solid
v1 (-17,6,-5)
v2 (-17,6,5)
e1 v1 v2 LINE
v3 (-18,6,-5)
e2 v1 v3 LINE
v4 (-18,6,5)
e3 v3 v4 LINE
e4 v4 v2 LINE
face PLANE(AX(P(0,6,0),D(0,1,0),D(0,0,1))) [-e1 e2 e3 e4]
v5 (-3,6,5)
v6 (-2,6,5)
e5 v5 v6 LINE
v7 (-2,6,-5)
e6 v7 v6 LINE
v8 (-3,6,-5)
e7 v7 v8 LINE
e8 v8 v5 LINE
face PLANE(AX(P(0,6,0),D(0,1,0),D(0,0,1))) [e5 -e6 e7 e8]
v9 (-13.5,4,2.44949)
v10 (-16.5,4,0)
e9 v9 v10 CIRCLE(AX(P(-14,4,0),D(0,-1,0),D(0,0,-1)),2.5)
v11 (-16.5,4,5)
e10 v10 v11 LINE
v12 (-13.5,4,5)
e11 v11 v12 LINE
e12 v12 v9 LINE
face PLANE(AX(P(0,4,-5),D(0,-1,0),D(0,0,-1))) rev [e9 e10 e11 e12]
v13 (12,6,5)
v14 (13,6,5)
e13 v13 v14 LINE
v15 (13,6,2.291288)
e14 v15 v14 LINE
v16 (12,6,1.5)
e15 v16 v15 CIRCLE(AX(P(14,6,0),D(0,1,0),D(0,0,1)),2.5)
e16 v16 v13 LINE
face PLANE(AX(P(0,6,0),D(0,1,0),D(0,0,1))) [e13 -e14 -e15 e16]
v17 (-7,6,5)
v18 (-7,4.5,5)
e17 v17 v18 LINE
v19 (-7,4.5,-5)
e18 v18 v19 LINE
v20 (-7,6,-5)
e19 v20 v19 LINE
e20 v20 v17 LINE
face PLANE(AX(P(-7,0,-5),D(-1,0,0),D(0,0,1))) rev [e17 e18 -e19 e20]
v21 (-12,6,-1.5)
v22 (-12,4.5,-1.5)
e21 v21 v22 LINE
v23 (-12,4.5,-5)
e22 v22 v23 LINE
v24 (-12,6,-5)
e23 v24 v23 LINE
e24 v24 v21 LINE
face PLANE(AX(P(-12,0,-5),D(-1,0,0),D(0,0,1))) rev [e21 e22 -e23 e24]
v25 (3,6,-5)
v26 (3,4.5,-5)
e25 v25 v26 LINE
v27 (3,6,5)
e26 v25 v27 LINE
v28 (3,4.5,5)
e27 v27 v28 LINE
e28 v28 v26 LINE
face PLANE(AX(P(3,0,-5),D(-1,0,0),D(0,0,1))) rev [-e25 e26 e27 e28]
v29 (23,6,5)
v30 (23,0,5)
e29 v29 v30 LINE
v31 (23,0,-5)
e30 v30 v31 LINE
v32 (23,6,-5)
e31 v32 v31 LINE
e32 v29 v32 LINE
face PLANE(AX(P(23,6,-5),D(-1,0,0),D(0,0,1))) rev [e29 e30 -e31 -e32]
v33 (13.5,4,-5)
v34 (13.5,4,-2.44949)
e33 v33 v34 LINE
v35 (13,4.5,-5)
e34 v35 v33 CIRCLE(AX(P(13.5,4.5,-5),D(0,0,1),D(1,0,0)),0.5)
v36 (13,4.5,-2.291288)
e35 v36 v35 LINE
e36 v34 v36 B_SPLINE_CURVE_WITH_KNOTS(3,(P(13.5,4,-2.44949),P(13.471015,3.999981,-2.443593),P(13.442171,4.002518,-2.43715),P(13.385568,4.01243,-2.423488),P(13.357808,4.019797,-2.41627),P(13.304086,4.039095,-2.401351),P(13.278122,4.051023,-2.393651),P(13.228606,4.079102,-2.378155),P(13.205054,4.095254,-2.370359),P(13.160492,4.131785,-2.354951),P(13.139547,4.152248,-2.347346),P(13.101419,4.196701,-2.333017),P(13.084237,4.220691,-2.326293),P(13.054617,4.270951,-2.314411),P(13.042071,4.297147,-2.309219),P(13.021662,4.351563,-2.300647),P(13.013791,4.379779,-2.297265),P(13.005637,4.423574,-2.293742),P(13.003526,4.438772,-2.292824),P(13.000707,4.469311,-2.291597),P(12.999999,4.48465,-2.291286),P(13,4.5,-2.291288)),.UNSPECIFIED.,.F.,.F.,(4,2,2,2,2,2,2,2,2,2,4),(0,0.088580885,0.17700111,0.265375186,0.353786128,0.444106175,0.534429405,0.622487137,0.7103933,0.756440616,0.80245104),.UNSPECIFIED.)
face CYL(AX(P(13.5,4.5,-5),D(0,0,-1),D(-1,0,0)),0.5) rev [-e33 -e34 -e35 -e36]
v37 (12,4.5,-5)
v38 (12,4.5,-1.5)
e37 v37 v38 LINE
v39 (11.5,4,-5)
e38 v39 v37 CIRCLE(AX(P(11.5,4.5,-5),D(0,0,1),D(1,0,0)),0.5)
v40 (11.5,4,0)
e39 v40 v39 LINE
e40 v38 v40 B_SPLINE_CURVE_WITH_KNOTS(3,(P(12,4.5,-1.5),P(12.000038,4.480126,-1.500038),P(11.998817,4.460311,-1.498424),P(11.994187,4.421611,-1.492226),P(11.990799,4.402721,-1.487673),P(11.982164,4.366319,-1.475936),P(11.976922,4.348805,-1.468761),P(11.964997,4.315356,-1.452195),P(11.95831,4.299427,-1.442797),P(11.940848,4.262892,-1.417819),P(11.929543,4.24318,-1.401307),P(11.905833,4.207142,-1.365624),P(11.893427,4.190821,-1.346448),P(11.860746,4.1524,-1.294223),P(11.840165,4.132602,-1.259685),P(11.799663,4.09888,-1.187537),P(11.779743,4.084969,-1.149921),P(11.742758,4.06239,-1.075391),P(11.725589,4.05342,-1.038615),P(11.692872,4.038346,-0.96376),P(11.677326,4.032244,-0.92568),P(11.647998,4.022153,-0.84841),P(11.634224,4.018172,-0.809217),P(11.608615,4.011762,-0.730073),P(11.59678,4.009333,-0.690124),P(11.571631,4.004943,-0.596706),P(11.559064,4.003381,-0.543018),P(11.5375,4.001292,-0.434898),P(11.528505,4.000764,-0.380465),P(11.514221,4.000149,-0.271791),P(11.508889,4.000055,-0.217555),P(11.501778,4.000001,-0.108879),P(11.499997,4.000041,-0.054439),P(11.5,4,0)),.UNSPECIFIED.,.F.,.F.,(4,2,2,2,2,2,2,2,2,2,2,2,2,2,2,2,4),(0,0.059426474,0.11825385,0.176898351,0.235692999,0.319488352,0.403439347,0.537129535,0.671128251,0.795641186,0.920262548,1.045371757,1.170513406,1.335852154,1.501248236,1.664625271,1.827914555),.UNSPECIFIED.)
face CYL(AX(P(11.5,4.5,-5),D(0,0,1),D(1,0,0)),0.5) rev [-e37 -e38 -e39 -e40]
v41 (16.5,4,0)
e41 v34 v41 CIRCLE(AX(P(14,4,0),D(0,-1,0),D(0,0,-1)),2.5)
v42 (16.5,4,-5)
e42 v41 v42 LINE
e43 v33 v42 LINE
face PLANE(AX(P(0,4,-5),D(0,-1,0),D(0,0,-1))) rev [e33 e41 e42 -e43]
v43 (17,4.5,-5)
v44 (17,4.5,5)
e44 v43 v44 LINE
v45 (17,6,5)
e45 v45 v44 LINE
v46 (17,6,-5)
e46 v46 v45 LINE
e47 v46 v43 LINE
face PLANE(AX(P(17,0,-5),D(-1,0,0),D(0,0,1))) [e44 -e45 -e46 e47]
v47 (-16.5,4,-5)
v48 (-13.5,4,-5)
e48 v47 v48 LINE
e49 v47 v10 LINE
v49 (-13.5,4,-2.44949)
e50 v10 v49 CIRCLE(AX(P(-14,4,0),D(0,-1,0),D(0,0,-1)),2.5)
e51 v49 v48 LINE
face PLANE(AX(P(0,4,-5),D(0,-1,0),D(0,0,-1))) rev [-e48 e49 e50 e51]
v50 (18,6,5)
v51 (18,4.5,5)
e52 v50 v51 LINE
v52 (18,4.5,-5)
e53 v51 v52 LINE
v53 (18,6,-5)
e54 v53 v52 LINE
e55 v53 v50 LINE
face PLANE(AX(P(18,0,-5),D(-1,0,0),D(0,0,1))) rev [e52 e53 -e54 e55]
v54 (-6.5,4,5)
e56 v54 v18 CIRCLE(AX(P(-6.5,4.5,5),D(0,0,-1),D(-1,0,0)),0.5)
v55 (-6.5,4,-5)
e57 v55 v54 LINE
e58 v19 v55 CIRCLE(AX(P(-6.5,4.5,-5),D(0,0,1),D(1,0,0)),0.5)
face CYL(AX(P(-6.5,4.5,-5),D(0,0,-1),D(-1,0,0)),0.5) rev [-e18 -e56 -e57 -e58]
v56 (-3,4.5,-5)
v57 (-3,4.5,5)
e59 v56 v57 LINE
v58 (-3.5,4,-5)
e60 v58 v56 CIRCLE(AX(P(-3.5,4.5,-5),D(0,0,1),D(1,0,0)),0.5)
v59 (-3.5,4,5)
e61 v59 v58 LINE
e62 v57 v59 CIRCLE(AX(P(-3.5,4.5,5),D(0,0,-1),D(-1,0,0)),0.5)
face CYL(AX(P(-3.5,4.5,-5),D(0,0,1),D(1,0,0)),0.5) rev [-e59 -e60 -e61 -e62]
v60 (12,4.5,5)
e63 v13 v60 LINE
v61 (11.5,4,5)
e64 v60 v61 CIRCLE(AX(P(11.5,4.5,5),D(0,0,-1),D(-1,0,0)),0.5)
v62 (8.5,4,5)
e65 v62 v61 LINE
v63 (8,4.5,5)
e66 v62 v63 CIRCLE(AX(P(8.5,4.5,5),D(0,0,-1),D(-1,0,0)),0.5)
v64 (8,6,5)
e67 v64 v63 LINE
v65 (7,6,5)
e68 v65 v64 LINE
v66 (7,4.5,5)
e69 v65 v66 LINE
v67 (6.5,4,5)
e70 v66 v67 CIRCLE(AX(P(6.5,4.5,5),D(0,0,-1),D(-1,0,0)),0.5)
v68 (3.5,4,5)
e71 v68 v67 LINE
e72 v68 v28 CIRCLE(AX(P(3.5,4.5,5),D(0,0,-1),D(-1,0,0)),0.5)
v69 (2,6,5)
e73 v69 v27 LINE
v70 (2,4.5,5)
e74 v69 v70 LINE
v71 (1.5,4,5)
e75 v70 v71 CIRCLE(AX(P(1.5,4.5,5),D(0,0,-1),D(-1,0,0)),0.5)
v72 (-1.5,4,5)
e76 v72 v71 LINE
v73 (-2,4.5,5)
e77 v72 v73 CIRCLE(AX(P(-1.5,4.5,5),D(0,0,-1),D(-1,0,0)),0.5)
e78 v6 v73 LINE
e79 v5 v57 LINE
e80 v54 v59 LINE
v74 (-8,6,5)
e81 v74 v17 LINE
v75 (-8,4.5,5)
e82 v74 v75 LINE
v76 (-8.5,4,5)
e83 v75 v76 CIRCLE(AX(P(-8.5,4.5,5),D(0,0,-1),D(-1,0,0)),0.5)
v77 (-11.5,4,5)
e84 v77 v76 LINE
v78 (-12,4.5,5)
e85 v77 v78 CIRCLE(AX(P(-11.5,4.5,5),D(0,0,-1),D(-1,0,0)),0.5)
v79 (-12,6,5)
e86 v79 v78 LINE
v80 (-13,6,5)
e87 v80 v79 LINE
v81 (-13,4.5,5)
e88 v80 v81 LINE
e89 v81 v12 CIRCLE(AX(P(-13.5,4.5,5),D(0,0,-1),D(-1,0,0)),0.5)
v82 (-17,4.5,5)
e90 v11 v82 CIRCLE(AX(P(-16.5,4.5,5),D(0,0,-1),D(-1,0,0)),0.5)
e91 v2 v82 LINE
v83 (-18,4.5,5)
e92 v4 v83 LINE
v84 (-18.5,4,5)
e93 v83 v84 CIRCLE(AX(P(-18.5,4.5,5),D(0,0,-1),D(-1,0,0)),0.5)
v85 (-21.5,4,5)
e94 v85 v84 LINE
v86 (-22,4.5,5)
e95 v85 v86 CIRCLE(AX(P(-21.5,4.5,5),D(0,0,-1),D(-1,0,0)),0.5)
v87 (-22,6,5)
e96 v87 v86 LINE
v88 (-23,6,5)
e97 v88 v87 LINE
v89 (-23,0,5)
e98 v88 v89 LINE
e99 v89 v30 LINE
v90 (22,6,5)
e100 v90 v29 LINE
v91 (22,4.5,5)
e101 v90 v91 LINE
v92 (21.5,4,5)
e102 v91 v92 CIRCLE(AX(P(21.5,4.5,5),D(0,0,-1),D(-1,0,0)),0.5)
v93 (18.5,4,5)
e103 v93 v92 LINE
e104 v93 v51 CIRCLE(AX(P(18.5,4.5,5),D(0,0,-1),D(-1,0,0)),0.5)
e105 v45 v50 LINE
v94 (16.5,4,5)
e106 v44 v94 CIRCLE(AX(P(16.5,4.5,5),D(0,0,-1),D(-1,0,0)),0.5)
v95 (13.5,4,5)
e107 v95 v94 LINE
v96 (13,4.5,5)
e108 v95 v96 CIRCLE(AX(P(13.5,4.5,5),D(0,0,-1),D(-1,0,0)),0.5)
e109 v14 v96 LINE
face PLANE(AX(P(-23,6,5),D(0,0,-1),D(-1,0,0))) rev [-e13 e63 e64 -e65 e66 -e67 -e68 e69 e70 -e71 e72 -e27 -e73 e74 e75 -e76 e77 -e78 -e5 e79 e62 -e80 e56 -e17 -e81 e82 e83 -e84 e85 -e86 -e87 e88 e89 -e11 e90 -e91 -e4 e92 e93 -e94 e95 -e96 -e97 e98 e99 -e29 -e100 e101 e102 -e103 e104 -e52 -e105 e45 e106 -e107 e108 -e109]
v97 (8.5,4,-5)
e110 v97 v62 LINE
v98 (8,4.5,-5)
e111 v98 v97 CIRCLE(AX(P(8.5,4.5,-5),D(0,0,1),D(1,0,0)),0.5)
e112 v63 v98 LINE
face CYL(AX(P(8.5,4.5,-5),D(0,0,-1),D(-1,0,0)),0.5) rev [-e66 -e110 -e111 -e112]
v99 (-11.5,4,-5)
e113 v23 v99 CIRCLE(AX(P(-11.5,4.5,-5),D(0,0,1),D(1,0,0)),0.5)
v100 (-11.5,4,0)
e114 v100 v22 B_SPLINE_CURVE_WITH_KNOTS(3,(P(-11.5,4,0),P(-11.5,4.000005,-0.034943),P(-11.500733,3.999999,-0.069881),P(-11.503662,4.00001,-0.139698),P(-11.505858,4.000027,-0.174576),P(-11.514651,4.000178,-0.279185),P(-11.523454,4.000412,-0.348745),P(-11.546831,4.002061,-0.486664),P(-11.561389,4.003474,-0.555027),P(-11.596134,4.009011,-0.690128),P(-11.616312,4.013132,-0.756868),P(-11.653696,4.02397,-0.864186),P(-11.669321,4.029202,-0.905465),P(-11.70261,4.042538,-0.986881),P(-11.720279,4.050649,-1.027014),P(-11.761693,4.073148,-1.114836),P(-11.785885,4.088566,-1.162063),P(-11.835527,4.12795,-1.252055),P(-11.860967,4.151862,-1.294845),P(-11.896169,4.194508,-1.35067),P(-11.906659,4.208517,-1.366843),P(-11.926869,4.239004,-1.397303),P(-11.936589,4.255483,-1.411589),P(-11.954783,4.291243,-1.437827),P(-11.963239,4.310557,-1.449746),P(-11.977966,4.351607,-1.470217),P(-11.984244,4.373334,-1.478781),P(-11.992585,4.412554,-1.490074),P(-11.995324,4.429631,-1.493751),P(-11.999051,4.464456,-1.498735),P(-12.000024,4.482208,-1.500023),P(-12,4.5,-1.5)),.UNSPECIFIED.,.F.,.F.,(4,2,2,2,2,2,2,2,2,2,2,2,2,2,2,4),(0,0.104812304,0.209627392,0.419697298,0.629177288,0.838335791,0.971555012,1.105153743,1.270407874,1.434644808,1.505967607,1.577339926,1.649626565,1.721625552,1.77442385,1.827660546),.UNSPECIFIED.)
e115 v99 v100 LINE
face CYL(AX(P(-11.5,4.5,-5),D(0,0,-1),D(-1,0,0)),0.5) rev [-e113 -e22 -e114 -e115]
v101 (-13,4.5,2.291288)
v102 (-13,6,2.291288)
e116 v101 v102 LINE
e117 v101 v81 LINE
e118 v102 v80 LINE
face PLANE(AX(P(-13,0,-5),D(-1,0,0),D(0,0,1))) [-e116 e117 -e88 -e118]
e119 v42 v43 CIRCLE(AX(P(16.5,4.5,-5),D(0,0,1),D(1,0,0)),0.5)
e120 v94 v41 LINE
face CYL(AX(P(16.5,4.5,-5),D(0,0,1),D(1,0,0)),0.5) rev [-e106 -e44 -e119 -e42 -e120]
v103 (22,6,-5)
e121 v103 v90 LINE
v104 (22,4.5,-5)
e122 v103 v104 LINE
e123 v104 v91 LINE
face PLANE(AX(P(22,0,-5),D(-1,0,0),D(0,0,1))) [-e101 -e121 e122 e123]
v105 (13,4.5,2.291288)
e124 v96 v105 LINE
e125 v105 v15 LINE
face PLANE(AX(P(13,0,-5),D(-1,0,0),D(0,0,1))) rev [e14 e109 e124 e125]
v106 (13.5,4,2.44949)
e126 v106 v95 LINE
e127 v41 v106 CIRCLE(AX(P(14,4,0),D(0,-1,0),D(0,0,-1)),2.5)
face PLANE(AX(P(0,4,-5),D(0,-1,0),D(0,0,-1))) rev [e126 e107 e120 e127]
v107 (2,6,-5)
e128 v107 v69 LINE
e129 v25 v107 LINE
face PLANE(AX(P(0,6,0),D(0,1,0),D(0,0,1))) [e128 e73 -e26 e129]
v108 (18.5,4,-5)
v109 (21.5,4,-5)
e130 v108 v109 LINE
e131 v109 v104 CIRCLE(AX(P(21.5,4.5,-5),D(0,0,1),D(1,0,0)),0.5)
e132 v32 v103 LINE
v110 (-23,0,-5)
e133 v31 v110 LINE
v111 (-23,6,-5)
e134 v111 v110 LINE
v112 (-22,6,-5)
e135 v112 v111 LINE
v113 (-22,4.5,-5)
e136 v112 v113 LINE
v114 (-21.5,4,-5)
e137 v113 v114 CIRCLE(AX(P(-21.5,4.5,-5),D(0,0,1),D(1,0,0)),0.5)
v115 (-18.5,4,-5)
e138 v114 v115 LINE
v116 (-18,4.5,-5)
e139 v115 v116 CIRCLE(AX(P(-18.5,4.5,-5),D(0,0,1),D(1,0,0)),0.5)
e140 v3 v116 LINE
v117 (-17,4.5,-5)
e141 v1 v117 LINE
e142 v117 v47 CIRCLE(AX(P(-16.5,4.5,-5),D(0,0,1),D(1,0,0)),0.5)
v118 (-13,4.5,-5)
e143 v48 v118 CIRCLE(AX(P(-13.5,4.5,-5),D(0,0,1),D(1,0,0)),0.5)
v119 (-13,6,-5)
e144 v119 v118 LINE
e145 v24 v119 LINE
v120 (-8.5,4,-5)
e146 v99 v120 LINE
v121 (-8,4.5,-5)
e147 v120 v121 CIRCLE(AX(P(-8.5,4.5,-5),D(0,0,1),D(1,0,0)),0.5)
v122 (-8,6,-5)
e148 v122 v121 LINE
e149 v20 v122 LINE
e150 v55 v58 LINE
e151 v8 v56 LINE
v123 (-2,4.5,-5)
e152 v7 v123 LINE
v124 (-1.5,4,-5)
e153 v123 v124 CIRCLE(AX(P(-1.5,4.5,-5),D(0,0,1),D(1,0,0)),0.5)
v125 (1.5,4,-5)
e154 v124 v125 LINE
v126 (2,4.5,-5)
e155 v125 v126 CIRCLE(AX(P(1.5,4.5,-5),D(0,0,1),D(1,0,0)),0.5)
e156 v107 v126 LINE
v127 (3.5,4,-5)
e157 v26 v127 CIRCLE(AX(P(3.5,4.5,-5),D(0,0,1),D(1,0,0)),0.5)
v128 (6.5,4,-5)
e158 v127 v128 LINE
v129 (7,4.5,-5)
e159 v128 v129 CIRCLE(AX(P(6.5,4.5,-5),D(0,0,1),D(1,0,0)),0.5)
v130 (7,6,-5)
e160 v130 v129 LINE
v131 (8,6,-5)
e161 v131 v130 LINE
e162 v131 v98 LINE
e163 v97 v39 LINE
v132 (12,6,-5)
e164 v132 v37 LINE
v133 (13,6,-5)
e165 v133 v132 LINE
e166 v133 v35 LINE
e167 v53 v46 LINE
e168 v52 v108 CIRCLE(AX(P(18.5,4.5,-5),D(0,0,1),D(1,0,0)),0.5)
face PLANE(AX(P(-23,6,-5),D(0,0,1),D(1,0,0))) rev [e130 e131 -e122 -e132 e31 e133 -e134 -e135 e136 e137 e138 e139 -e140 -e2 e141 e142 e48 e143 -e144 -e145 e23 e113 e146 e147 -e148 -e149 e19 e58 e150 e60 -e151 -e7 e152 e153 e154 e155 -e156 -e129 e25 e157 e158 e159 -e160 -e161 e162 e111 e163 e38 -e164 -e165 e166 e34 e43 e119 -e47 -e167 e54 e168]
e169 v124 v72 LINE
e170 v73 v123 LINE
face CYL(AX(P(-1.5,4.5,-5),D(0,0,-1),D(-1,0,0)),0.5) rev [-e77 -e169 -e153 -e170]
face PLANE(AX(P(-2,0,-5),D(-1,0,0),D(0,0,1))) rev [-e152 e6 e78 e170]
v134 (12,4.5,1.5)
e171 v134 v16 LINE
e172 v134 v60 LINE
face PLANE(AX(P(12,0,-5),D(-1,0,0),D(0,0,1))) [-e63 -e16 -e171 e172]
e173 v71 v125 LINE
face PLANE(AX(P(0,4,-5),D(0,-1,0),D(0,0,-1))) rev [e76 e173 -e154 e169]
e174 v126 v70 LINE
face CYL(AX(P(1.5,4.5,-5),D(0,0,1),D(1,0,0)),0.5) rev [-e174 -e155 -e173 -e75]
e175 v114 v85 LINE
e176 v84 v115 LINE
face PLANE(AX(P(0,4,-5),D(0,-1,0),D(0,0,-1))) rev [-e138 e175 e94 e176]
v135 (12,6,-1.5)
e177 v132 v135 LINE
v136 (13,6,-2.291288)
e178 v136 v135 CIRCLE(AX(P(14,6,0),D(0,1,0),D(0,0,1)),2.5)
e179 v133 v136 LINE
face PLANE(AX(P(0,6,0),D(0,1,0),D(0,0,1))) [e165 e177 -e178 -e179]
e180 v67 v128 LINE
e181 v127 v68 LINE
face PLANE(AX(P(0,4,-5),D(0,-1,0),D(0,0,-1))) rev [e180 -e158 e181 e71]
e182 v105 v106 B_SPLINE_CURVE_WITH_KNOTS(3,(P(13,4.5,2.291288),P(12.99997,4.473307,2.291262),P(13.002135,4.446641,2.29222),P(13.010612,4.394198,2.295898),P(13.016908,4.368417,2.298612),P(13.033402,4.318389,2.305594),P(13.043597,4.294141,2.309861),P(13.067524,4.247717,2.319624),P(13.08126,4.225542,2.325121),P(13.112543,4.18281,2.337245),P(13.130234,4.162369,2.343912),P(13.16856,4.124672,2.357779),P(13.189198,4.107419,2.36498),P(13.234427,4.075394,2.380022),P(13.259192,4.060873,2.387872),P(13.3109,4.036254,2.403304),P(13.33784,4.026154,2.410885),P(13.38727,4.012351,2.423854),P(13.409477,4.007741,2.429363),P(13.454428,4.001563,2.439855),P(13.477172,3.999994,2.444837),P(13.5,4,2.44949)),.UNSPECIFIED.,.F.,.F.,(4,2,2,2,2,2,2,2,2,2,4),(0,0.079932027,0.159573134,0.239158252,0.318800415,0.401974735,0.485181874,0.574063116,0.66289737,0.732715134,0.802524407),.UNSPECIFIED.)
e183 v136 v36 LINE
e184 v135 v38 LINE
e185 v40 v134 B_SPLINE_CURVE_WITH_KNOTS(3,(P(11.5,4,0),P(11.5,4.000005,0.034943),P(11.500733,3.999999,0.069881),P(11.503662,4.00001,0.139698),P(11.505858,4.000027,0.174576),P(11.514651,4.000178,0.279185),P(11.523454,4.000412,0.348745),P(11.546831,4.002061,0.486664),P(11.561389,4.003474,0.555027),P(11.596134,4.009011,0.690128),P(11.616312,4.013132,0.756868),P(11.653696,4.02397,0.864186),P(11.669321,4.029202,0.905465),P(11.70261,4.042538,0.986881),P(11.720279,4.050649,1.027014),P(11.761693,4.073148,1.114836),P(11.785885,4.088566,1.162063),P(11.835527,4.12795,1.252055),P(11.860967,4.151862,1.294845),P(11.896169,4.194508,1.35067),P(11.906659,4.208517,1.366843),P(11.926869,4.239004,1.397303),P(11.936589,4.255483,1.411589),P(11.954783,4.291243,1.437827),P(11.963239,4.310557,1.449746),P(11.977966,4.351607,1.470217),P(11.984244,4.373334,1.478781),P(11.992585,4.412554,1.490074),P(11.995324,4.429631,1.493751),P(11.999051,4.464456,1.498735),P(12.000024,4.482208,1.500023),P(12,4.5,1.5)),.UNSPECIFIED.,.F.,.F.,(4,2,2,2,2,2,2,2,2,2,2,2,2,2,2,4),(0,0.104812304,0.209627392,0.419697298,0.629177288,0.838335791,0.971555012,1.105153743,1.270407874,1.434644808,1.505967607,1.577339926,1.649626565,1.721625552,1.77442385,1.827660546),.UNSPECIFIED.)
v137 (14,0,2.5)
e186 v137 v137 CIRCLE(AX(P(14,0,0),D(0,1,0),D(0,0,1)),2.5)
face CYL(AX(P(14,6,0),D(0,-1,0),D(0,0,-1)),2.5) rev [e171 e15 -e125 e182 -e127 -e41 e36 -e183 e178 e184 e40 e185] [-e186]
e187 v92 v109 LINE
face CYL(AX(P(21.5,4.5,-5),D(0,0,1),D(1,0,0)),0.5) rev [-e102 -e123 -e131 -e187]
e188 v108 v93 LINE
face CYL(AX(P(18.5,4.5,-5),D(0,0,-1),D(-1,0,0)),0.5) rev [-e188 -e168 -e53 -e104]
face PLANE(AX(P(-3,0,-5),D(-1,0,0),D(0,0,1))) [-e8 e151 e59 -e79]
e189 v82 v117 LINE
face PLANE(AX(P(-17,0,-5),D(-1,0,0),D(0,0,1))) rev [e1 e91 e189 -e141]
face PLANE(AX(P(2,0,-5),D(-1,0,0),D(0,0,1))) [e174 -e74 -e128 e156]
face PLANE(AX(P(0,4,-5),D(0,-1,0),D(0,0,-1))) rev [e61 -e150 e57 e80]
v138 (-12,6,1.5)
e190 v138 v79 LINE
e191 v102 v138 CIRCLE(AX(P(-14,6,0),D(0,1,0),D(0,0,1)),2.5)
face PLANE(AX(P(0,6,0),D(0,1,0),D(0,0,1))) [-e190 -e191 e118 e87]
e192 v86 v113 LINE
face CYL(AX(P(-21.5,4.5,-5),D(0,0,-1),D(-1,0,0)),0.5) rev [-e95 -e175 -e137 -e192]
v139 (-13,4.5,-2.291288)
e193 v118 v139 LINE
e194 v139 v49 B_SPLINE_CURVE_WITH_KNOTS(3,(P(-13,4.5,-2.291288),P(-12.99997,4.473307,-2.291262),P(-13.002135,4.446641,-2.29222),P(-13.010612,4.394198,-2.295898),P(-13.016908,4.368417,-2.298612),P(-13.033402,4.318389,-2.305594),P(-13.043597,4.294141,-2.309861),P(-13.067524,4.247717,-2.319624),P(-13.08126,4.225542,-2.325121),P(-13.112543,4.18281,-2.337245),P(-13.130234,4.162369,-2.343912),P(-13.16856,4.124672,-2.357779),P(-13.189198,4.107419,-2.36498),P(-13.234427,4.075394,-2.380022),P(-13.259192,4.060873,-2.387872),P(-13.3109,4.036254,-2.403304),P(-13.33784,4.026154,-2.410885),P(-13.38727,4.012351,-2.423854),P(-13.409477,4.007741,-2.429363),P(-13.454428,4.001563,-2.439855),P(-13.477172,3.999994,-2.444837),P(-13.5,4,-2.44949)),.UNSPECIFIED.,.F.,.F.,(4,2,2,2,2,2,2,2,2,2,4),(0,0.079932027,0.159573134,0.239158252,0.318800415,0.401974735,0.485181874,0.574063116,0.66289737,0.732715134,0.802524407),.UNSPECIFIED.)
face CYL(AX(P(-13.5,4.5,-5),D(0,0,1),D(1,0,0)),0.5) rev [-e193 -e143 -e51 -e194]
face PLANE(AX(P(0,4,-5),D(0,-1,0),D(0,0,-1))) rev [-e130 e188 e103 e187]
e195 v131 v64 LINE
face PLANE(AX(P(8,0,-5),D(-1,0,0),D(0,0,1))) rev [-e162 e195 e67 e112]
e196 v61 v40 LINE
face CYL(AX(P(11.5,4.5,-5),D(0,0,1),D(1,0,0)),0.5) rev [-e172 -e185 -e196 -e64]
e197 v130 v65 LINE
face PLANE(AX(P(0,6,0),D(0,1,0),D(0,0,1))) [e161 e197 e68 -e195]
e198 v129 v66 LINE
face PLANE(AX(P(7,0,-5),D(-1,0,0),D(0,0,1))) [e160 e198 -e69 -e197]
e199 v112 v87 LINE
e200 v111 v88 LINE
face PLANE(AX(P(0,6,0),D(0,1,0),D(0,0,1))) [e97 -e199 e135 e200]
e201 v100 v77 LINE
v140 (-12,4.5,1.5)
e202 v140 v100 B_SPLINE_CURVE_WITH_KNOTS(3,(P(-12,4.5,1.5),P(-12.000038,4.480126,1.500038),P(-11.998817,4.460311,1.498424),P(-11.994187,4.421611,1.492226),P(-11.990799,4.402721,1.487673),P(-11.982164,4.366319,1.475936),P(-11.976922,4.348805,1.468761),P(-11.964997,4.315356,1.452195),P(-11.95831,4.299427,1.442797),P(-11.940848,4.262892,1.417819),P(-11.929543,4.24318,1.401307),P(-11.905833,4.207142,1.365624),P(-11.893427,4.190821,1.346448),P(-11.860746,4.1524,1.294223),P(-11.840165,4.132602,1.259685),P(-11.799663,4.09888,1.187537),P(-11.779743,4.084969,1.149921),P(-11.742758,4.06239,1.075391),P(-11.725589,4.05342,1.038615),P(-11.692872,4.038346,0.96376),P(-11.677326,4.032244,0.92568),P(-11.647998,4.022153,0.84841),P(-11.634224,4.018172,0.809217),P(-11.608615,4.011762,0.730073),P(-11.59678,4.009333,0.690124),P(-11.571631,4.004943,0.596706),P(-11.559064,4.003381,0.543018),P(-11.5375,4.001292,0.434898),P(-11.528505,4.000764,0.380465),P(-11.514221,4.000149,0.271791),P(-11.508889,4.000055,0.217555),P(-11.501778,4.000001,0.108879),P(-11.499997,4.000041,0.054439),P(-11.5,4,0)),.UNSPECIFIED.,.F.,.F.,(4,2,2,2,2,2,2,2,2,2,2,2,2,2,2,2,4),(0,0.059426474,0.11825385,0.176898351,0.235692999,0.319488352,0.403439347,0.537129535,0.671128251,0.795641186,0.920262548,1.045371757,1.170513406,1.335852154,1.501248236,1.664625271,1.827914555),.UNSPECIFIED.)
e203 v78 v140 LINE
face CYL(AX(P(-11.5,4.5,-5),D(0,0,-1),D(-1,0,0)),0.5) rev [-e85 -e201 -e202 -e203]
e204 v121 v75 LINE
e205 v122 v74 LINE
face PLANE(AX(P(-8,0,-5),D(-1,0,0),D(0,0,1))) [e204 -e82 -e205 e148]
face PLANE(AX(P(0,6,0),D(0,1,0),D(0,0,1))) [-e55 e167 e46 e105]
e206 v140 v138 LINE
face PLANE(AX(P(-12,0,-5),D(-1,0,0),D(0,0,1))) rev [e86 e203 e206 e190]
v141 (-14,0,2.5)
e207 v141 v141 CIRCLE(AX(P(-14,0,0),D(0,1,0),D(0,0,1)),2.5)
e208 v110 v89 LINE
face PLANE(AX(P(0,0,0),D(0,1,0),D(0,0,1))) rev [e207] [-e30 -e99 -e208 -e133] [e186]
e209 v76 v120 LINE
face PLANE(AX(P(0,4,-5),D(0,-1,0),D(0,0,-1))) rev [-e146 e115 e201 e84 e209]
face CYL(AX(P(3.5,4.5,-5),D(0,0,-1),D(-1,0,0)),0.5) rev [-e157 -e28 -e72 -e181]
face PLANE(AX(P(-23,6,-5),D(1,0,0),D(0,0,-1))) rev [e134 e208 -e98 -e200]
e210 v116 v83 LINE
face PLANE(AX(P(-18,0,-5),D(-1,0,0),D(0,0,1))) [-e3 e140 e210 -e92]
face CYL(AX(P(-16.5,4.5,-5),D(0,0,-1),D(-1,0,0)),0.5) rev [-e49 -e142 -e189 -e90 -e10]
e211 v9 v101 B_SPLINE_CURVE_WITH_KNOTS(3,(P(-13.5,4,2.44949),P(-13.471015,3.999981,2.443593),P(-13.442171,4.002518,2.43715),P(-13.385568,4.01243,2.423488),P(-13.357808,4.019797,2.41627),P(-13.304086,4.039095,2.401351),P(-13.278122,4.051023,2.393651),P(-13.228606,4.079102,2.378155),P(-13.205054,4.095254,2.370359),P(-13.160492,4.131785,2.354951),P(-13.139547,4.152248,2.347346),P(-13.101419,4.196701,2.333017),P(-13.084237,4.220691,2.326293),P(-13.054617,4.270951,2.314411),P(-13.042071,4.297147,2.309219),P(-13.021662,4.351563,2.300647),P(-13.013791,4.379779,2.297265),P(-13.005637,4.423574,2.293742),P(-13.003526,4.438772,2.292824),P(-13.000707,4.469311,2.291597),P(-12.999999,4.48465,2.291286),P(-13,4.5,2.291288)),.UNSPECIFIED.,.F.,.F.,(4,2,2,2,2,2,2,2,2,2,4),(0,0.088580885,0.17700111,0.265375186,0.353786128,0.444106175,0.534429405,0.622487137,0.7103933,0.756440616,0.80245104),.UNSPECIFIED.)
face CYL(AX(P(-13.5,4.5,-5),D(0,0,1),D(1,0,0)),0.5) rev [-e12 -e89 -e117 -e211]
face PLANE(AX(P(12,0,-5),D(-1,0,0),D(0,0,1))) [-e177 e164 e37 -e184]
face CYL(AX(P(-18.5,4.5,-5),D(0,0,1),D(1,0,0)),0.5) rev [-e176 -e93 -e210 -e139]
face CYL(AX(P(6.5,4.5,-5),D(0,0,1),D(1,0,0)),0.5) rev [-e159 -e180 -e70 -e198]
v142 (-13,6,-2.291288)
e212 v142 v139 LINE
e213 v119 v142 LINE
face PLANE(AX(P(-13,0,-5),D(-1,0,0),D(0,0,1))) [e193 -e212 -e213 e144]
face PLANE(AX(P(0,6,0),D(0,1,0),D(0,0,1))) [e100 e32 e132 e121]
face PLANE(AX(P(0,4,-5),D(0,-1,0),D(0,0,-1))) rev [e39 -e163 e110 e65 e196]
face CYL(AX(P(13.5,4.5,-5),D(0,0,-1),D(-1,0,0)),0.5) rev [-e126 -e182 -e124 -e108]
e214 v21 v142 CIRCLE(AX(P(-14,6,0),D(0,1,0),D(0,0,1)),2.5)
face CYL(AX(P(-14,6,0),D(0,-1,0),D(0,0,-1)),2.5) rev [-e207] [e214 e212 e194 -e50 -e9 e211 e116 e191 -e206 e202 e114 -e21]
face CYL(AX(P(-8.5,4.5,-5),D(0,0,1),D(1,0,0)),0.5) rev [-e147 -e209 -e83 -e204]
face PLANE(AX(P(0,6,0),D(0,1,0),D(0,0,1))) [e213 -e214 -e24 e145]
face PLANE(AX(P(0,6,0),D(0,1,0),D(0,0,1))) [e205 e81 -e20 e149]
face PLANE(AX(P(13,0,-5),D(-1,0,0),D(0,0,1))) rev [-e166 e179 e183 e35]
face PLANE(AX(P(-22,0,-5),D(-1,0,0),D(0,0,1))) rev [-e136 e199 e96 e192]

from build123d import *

# Parameters (mm, degrees)
SKETCH1_W           = 46
SKETCH1_H           = 10
SKETCH1_R           = 2.5
BOSS_EXTRUDE1_DEPTH = 6
SKETCH2_W           = 4
SKETCH2_H           = 2
CUT_EXTRUDE1_DEPTH  = 26.787593916
FILLET2_R           = 0.5


with BuildPart() as part:
    # Sketch1 → Boss-Extrude1 (new body)
    with BuildSketch(Plane(origin=(0, 0, 0), x_dir=(1, 0, 0), z_dir=(0, 1, 0))):
        Rectangle(SKETCH1_W, SKETCH1_H)
        with Locations(Location((14, 0, 0), (0, 0, 270))):
            Circle(SKETCH1_R, mode=Mode.SUBTRACT)
        with Locations(Location((-14, 0, 0), (0, 0, 270))):
            Circle(SKETCH1_R, mode=Mode.SUBTRACT)
    extrude(amount=BOSS_EXTRUDE1_DEPTH)

    # Sketch2 → Cut-Extrude1 (cut, through all)
    with BuildSketch(Plane.XY.offset(5)):
        with Locations((-20, 5)):
            Rectangle(SKETCH2_W, SKETCH2_H)
        with Locations((-15, 5)):
            Rectangle(SKETCH2_W, SKETCH2_H)
        with Locations((-10, 5)):
            Rectangle(SKETCH2_W, SKETCH2_H)
        with Locations((-5, 5)):
            Rectangle(SKETCH2_W, SKETCH2_H)
        with Locations((0, 5)):
            Rectangle(SKETCH2_W, SKETCH2_H)
        with Locations((5, 5)):
            Rectangle(SKETCH2_W, SKETCH2_H)
        with Locations((10, 5)):
            Rectangle(SKETCH2_W, SKETCH2_H)
        with Locations((15, 5)):
            Rectangle(SKETCH2_W, SKETCH2_H)
        with Locations((20, 5)):
            Rectangle(SKETCH2_W, SKETCH2_H)
    extrude(amount=-CUT_EXTRUDE1_DEPTH, mode=Mode.SUBTRACT)

    # Fillet2
    fillet2_edges = [part.edges().sort_by_distance(p)[0] for p in [
        (3, 4, 0),
        (7, 4, 0),
        (8, 4, 0),
        (12, 4, 3.25),
        (12, 4, -3.25),
        (13, 4, -3.645643924),
        (13, 4, 3.645643924),
        (17, 4, 0),
        (18, 4, 0),
        (22, 4, 0),
        (-18, 4, 0),
        (-22, 4, 0),
        (-13, 4, 3.645643924),
        (-13, 4, -3.645643924),
        (-17, 4, 0),
        (-12, 4, -3.25),
        (-12, 4, 3.25),
        (-8, 4, 0),
        (-7, 4, 0),
        (-3, 4, 0),
        (-2, 4, 0),
        (2, 4, 0),
    ]]
    fillet(fillet2_edges, radius=FILLET2_R - 0.0001)  # a hair under: the kernel refuses the full size


solid = part.part
